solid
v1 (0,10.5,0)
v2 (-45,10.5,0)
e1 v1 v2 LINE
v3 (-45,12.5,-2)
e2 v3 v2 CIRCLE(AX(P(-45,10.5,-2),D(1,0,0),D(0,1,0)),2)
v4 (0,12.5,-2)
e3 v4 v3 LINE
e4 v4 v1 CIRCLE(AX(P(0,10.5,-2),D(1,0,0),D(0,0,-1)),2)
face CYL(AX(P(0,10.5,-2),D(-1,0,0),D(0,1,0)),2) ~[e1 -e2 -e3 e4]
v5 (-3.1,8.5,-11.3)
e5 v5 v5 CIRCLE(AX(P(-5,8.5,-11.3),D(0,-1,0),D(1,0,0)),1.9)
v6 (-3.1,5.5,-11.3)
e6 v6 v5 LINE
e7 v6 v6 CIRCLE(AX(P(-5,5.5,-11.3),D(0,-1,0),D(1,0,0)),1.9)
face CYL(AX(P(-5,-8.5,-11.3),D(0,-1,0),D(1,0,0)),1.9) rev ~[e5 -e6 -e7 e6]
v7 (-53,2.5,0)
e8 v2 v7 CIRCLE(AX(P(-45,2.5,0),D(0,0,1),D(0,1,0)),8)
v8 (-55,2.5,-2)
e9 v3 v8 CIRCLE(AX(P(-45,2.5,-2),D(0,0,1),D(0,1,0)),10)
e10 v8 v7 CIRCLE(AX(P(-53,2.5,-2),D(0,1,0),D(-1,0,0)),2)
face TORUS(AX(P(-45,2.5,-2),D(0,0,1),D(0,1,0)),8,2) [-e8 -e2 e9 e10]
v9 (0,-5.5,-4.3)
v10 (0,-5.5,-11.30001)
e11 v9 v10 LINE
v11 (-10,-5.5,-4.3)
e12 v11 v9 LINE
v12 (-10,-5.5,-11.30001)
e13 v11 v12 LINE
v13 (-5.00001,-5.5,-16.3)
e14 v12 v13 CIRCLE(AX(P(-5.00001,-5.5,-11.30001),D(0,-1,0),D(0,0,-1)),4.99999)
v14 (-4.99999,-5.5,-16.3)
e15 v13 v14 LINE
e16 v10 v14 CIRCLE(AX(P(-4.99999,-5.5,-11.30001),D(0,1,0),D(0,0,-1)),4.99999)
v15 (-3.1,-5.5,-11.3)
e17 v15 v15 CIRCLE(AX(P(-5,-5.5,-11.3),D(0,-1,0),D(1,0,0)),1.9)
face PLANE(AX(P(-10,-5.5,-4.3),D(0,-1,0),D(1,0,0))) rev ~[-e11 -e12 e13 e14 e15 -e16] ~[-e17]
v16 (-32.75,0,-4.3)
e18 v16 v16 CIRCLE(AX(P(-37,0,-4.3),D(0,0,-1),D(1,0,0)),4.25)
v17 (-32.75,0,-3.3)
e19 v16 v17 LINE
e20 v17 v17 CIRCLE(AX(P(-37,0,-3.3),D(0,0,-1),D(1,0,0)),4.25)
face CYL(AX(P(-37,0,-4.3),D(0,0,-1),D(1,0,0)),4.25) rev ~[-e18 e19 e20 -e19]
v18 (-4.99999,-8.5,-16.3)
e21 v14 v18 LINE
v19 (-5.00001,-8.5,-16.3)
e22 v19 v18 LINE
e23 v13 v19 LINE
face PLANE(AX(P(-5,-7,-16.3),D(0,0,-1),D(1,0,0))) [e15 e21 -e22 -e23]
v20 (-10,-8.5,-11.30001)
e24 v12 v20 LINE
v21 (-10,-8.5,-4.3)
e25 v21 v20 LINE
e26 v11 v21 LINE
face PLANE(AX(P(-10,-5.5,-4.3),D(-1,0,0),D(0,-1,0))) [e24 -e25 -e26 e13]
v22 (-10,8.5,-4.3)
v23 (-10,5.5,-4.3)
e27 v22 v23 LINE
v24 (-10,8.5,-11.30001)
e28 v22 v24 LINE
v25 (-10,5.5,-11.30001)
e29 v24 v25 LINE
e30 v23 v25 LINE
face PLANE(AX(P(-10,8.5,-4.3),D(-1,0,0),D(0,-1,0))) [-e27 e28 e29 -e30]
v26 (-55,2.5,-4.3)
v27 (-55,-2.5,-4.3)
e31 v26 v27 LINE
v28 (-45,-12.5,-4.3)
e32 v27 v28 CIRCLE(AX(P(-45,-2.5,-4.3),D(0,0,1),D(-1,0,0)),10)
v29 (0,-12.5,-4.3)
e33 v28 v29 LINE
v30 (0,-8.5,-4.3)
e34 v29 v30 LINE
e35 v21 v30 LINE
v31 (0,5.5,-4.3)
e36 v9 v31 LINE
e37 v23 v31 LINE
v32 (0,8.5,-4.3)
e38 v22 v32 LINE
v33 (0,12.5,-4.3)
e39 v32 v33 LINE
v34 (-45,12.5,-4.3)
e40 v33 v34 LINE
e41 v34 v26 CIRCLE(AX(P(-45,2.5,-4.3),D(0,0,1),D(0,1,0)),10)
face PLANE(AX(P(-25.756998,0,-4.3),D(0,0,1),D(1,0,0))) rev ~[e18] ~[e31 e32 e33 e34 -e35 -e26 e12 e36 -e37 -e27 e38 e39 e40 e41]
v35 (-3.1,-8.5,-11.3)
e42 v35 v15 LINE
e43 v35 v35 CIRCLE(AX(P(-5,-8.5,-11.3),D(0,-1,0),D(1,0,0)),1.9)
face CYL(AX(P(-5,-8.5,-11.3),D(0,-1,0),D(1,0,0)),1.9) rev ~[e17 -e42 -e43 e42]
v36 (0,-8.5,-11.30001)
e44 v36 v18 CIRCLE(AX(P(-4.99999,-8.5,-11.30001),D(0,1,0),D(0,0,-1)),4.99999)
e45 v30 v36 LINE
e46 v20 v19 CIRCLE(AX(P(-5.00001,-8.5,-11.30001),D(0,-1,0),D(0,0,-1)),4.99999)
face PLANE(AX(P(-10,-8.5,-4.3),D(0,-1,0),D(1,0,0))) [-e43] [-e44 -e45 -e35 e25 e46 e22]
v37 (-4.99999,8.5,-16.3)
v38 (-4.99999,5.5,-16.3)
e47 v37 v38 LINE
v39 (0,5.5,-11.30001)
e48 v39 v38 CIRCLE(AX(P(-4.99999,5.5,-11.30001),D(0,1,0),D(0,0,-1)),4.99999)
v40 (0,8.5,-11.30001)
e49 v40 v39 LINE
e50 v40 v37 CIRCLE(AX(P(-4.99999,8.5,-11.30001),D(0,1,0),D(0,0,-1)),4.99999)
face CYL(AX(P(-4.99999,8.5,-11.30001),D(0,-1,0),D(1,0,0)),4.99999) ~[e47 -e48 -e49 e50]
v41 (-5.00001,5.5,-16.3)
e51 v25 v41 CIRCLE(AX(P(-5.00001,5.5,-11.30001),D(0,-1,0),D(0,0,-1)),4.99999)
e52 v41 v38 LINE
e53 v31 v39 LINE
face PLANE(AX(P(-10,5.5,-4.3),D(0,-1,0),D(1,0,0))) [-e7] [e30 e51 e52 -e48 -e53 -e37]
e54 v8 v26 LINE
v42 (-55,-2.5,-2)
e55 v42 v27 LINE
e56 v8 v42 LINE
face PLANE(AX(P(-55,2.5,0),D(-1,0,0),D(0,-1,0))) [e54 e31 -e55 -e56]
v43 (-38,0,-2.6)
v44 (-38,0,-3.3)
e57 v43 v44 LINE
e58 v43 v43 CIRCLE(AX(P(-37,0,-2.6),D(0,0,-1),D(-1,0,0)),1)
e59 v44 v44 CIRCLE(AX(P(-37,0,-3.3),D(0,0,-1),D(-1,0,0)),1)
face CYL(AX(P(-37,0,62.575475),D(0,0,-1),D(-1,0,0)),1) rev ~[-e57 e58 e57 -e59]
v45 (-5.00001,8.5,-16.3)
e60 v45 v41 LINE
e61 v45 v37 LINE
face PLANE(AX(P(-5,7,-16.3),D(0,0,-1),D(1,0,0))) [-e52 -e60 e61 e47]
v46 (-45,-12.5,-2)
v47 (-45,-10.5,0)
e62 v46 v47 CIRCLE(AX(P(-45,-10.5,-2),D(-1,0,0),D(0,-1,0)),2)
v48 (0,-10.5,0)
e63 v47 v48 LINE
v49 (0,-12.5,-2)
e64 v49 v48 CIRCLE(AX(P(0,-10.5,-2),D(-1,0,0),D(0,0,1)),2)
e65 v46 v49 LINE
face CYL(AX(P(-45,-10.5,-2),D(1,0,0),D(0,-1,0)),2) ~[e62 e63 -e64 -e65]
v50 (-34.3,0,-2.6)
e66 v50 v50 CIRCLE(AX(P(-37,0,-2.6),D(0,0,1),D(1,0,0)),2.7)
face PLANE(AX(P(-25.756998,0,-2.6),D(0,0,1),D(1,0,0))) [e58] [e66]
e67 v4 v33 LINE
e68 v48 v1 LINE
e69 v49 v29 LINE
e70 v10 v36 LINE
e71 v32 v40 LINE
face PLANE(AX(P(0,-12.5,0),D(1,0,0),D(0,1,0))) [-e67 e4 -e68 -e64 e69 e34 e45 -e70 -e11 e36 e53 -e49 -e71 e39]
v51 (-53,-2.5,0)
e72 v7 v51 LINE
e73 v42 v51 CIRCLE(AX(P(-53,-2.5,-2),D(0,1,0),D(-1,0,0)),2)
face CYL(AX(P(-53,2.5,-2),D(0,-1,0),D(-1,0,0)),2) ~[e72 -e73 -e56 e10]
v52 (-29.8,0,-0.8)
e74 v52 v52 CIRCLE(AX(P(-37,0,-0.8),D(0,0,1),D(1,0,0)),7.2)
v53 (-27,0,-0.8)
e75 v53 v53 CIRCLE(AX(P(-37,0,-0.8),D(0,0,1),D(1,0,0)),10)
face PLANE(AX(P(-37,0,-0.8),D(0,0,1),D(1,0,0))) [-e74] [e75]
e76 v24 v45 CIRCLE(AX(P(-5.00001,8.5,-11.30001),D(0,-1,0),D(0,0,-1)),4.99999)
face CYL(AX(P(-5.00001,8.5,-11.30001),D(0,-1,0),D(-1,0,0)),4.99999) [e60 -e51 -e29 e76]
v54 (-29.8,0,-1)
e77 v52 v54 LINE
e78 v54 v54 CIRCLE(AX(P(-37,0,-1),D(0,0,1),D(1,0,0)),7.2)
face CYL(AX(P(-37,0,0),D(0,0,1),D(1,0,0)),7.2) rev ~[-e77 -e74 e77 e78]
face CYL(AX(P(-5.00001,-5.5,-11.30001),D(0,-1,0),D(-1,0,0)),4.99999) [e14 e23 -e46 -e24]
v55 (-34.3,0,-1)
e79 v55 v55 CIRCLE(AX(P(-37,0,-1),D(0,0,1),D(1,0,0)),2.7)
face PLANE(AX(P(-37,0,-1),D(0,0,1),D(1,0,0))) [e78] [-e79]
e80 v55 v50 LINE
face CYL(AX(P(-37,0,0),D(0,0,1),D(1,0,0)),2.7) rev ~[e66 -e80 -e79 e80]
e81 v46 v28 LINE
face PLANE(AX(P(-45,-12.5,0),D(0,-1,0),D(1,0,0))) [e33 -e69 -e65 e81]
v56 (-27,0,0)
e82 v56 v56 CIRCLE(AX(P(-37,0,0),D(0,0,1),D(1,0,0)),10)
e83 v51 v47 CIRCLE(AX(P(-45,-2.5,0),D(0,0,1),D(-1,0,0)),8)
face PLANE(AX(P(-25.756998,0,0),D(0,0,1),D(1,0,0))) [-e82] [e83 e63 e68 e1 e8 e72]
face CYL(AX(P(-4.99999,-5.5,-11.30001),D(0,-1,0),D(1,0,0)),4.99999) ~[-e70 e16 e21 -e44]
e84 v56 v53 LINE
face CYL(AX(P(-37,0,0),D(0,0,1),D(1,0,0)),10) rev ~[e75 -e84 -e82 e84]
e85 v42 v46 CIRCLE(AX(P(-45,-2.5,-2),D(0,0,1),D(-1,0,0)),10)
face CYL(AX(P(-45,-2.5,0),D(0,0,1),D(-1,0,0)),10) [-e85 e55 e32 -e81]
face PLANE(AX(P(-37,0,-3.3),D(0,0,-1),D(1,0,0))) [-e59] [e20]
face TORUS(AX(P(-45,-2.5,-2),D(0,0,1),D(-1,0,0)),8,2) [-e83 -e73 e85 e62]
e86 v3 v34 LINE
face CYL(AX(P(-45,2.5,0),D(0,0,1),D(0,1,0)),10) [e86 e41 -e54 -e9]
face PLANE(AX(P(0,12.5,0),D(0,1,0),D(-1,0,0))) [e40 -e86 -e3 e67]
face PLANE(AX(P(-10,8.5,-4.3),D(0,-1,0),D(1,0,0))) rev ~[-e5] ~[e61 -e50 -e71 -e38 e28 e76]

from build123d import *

# Parameters (mm, degrees)
F0_R      = 10
F0_R_2    = 7.2
F0_R_3    = 2.7
F1_DEPTH  = 4.3
F2_DEPTH  = 0.8
F3_DEPTH  = 1
F4_R      = 4.25
F5_DEPTH  = 1
F4_W      = 10
F4_H      = 3
F6_DEPTH  = 12
F8_R      = 4.99999
F7_R      = 1.9
F9_DEPTH  = 25
F10_R     = 2
F11_DEPTH = 2.6
F12_D     = 2


# Not quite as in the source:
# - a fillet or chamfer is up to 0.001 mm smaller than in the source, because OpenCascade refuses the exact size


with BuildPart() as f1:
    # F0 (on Top) → F1 (new body)
    with BuildSketch(Plane.XY):
        with BuildLine():
            Line((0, 12.5), (-45, 12.5))
            ThreePointArc((-45, 12.5), (-52.0710678119, 9.5710678119), (-55, 2.5))
            Line((-55, 2.5), (-55, -2.5))
            ThreePointArc((-55, -2.5), (-52.0710678119, -9.5710678119), (-45, -12.5))
            Line((-45, -12.5), (0, -12.5))
            Line((0, -12.5), (0, 12.5))
        make_face()
        with Locations((-37, 0)):
            Circle(F0_R, mode=Mode.SUBTRACT)
        with Locations((-37, 0)):
            Circle(F0_R)
        with Locations((-37, 0)):
            Circle(F0_R_2, mode=Mode.SUBTRACT)
        with Locations((-37, 0)):
            Circle(F0_R_2)
        with Locations((-37, 0)):
            Circle(F0_R_3, mode=Mode.SUBTRACT)
        with Locations((-37, 0)):
            Circle(F0_R_3)
    extrude(amount=-F1_DEPTH)

    # F0 (on Top) → F2 (cut)
    with BuildSketch(Plane.XY):
        with Locations((-37, 0)):
            Circle(F0_R)
        with Locations((-37, 0)):
            Circle(F0_R_2, mode=Mode.SUBTRACT)
        with Locations((-37, 0)):
            Circle(F0_R_2)
        with Locations((-37, 0)):
            Circle(F0_R_3, mode=Mode.SUBTRACT)
    extrude(amount=-F2_DEPTH, mode=Mode.SUBTRACT)

    # F0 (on Top) → F3 (cut)
    with BuildSketch(Plane.XY):
        with Locations((-37, 0)):
            Circle(F0_R_2)
        with Locations((-37, 0)):
            Circle(F0_R_3, mode=Mode.SUBTRACT)
    extrude(amount=-F3_DEPTH, mode=Mode.SUBTRACT)

    # F4 (on face) → F5 (cut)
    with BuildSketch(Plane(origin=(0, 0, -4.3), x_dir=(1, 0, 0), z_dir=(0, 0, -1))):
        with Locations((-37, 0)):
            Circle(F4_R)
    extrude(amount=-F5_DEPTH, mode=Mode.SUBTRACT)

    # F4 (on face) → F6 (join)
    with BuildSketch(Plane(origin=(0, 0, -4.3), x_dir=(1, 0, 0), z_dir=(0, 0, -1))):
        with Locations((-5, 7)):
            Rectangle(F4_W, F4_H)
        with Locations((-5, -7)):
            Rectangle(F4_W, F4_H)
    extrude(amount=F6_DEPTH)

    # F8 (radius 5 in the source; OpenCascade refuses exactly that, so slightly less here)
    f8_edges = [f1.edges().sort_by_distance(p)[0] for p in [
        (0, -7, -16.3),
        (0, 7, -16.3),
        (-10, 7, -16.3),
        (-10, -7, -16.3),
    ]]
    fillet(f8_edges, radius=F8_R)

    # F7 (on face) → F9 (cut)
    with BuildSketch(Plane.XZ.offset(8.5)):
        with Locations((-5, -11.3)):
            Circle(F7_R)
    extrude(amount=-F9_DEPTH, mode=Mode.SUBTRACT)

    # F10
    f10_edges = [f1.edges().sort_by_distance(p)[0] for p in [
        (-22.5, -12.5, 0),
    ]]
    fillet(f10_edges, radius=F10_R)

    # F11 (cut): a face of the model
    f11_faces = [f1.faces().sort_by_distance(p)[0] for p in [
        (-37, 0, 0),
    ]]
    extrude(f11_faces, amount=-F11_DEPTH, mode=Mode.SUBTRACT)

    # F12 (through all)
    with Locations(Plane.XY):
        with Locations((-37, 0)):
            Hole(F12_D / 2)


solid = f1.part
